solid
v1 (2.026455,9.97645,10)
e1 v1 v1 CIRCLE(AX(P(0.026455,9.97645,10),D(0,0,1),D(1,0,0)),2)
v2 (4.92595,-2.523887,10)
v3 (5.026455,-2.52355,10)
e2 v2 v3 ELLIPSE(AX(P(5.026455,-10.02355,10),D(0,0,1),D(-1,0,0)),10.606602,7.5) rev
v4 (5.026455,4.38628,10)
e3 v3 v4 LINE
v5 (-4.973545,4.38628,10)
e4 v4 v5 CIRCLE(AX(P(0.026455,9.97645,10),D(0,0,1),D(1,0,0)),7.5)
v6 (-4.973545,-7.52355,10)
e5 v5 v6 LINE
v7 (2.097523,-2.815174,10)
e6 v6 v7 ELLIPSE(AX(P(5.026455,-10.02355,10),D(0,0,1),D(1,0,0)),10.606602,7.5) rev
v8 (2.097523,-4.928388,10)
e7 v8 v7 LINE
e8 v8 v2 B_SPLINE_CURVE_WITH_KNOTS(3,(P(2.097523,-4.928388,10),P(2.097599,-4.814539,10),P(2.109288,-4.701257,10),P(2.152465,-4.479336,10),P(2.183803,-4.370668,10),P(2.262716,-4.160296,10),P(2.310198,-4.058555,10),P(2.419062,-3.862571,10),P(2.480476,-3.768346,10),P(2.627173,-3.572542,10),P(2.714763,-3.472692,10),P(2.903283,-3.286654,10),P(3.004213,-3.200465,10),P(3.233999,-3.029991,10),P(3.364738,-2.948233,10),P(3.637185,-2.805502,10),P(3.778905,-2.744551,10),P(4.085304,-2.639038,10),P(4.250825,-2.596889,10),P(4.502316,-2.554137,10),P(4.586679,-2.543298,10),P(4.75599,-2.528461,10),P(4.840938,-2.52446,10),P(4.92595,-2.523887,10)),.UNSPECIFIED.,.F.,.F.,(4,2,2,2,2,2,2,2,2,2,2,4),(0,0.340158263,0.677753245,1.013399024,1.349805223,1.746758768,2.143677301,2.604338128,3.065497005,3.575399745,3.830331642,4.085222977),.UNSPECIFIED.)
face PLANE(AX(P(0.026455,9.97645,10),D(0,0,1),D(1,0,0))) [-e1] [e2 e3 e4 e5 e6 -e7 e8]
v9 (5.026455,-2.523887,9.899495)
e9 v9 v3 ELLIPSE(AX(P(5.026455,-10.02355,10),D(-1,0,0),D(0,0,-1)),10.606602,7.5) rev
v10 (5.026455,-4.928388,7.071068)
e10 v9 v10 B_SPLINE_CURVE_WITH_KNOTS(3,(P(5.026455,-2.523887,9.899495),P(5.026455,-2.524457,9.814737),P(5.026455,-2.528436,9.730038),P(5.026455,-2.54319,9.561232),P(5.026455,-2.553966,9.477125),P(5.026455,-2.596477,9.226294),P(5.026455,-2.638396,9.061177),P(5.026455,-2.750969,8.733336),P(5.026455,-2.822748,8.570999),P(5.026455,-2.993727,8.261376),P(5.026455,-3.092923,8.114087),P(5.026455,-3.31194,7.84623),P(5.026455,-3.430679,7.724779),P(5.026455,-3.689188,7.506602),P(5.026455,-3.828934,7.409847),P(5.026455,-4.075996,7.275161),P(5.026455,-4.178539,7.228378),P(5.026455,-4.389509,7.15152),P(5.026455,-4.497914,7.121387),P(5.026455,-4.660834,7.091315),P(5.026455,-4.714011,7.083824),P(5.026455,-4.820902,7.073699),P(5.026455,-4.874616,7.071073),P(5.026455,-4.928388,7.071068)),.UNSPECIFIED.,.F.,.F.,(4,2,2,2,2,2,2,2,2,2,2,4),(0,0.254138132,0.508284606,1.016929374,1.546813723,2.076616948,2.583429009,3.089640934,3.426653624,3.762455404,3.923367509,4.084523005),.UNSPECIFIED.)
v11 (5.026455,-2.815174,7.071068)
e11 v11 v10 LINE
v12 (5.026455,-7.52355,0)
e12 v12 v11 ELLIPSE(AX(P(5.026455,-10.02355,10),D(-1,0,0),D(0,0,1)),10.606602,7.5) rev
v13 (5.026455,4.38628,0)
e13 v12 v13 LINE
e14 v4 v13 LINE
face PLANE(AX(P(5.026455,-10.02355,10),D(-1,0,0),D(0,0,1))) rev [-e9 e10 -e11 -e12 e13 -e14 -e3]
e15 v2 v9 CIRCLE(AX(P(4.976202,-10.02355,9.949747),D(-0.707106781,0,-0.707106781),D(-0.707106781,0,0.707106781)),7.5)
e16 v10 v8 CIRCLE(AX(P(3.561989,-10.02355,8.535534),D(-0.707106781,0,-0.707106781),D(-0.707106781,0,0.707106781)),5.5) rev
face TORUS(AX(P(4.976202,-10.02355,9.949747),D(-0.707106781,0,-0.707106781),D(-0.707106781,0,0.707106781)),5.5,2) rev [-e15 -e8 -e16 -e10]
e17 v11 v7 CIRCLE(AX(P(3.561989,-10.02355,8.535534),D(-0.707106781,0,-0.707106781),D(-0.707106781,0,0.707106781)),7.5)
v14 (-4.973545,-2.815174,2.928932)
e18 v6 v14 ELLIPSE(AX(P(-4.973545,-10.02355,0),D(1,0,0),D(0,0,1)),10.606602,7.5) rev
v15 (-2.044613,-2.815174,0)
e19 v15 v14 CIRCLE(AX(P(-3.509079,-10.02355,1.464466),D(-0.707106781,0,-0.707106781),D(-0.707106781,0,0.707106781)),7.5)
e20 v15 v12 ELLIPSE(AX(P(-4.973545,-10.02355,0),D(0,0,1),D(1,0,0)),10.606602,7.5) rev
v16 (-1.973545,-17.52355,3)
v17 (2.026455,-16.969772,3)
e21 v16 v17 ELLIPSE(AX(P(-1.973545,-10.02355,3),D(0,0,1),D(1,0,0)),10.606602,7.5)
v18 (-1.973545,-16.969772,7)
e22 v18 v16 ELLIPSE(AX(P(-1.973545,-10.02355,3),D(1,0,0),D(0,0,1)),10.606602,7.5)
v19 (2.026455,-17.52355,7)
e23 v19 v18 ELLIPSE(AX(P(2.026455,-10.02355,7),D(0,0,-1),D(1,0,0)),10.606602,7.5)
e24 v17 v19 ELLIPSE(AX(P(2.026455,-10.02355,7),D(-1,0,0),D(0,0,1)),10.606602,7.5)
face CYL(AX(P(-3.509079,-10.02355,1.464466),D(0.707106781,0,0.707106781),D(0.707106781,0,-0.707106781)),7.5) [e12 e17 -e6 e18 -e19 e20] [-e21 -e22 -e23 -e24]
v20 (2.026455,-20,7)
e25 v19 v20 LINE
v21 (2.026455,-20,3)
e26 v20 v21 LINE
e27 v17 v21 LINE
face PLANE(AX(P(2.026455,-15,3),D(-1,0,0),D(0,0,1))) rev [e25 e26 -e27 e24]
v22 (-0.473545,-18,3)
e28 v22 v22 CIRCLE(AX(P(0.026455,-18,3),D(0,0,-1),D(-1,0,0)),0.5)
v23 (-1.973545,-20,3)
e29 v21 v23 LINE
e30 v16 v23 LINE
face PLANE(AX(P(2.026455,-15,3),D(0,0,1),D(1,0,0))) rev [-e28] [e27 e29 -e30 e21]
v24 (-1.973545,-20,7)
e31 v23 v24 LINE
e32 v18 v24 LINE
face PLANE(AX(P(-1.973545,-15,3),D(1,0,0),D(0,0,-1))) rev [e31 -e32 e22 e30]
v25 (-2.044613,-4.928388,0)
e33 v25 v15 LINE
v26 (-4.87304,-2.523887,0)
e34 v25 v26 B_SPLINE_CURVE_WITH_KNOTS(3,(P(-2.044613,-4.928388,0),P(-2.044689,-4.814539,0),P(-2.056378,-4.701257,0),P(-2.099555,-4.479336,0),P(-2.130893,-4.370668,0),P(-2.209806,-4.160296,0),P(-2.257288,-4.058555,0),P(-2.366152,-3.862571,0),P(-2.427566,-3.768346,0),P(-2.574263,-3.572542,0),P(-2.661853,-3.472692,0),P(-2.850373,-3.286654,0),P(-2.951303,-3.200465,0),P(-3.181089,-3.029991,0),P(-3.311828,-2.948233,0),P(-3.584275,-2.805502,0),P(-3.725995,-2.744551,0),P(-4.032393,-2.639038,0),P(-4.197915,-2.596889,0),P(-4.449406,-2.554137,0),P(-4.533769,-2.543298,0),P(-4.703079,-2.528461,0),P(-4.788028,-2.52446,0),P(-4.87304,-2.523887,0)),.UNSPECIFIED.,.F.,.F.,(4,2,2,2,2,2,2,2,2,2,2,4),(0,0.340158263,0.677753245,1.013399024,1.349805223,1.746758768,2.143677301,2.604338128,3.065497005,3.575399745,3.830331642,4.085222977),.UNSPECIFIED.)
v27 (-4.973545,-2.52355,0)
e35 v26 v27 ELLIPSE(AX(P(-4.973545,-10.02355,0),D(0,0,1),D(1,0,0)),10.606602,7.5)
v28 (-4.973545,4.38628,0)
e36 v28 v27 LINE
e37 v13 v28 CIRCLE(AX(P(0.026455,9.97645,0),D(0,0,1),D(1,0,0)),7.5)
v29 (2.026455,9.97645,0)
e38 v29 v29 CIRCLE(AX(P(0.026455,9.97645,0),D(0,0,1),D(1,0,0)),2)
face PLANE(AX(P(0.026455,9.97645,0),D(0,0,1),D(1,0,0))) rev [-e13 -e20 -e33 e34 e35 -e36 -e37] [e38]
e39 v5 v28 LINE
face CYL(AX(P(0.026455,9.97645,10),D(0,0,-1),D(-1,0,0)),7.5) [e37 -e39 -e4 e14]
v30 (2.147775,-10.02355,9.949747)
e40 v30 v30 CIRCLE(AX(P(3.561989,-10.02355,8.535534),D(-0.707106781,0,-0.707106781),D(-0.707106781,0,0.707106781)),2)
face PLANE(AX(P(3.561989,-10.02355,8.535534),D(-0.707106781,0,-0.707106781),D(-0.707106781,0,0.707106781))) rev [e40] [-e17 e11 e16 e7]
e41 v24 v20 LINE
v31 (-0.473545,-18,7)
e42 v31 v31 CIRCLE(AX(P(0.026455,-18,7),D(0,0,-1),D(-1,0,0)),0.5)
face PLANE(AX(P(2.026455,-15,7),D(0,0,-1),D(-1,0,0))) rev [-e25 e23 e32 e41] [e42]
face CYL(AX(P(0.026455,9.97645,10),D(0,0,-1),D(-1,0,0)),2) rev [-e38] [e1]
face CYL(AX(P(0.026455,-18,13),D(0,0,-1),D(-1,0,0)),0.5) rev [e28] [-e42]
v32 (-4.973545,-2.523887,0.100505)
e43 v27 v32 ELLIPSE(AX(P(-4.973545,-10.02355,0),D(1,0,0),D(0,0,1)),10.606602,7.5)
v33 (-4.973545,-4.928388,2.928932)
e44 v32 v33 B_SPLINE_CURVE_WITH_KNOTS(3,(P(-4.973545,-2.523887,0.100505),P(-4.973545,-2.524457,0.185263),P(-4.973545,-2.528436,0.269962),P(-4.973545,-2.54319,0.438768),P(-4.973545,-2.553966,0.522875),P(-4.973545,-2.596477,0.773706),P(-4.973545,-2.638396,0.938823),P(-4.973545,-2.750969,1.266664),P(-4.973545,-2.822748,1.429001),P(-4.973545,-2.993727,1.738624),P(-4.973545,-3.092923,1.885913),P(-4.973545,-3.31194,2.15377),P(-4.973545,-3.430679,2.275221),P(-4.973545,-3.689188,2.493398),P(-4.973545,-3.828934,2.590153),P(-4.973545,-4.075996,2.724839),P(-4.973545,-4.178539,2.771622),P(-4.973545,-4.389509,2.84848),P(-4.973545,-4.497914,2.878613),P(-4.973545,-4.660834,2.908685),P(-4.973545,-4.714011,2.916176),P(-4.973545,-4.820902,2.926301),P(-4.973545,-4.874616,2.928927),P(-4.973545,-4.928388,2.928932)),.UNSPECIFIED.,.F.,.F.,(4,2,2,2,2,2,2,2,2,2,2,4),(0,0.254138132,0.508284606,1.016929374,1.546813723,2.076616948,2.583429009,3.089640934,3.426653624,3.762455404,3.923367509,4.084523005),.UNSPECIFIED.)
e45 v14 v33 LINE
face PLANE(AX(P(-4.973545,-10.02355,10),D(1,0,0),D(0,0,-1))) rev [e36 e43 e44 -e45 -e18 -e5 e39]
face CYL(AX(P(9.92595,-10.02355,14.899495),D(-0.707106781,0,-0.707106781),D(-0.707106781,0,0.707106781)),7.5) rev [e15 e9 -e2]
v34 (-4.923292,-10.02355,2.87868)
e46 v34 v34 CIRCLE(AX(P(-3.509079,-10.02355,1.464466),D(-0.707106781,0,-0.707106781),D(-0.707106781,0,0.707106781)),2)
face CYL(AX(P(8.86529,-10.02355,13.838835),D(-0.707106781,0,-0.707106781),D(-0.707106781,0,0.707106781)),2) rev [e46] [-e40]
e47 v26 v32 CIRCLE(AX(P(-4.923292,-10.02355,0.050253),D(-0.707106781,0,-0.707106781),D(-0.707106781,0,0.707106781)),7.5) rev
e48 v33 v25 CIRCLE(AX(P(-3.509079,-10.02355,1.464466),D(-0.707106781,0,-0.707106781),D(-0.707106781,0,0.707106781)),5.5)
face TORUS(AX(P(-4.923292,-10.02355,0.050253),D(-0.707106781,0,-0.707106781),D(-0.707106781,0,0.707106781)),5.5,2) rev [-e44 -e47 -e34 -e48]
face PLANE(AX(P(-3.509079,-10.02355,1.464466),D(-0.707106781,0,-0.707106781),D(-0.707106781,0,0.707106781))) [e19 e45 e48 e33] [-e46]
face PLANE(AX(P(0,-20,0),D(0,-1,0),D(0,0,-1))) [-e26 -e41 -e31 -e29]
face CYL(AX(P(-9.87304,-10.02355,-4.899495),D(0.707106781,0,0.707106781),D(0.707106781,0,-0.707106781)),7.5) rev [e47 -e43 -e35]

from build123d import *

# Parameters (mm, degrees)
SKETCH1_R               = 2
BOSS_EXTRUDE1_DEPTH     = 10
SKETCH6_R               = 7.5
BOSS_EXTRUDE3_DEPTH     = 5
CUT_EXTRUDE4_DEPTH      = 26.013853674
CUT_EXTRUDE4_DEPTH_BACK = 26.013853674
SKETCH7_R               = 2
SKETCH10_R              = 7.5
CUT_EXTRUDE7_DEPTH      = 9
SKETCH11_W              = 4
SKETCH11_H              = 4
BOSS_EXTRUDE4_DEPTH     = 2.5
FILLET1_R               = 2
SKETCH12_R              = 0.5
CUT_EXTRUDE8_DEPTH      = 10


with BuildPart() as part:
    # Sketch1 → Boss-Extrude1 (new body)
    with BuildSketch(Plane.XY):
        with BuildLine():
            Line((5.026455026, -10.023549892), (-4.973544974, -10.023549892))
            Line((-4.973544974, -10.023549892), (-4.973544974, 4.386280164))
            ThreePointArc((-4.973544974, 4.386280164), (0.026455026, 17.476450108), (5.026455026, 4.386280164))
            Line((5.026455026, 4.386280164), (5.026455026, -10.023549892))
        make_face()
        with Locations((0.026455026, 9.976450108)):
            Circle(SKETCH1_R, mode=Mode.SUBTRACT)
    extrude(amount=BOSS_EXTRUDE1_DEPTH)

    # Sketch6 → Boss-Extrude3 (add, symmetric)
    with BuildSketch(Plane(origin=(2.513227513, 0, 2.513227513), x_dir=(-0.7071067811865477, 0, 0.7071067811865475), z_dir=(-0.7071067811865475, 0, -0.7071067811865477))):
        with Locations((3.516827377, -10.023549892)):
            Circle(SKETCH6_R)
    extrude(amount=BOSS_EXTRUDE3_DEPTH, both=True)

    # Sketch7 → Cut-Extrude4 (cut, two sides: drawn at the far end of the back side and taken through both)
    with BuildSketch(Plane(origin=(-1.022306393, 0, -1.022306393), x_dir=(-0.7071067811865476, 0, 0.7071067811865476), z_dir=(-0.7071067811865476, 0, -0.7071067811865476)).offset(-CUT_EXTRUDE4_DEPTH_BACK)):
        with Locations((3.516827377, -10.023549892)):
            Circle(SKETCH7_R)
    extrude(amount=CUT_EXTRUDE4_DEPTH + CUT_EXTRUDE4_DEPTH_BACK, mode=Mode.SUBTRACT)

    # Sketch10 → Cut-Extrude7 (cut)
    with BuildSketch(Plane(origin=(6.048761419, 0, 6.048761419), x_dir=(0.7071067811865476, 0, -0.7071067811865476), z_dir=(0.7071067811865476, 0, 0.7071067811865476))):
        with Locations((-3.516827377, -10.023549892)):
            Circle(SKETCH10_R)
    cut_extrude7 = extrude(amount=CUT_EXTRUDE7_DEPTH, mode=Mode.SUBTRACT)

    # Mirror1: Cut-Extrude7 across plane
    add(cut_extrude7.mirror(Plane(origin=(2.513227513, 0, 2.513227513), x_dir=(-0.7071067811865478, 0, 0.7071067811865472), z_dir=(-0.7071067811865475, 0, -0.7071067811865477))), mode=Mode.SUBTRACT)

    # Sketch11 → Boss-Extrude4 (add, symmetric)
    with BuildSketch(Plane(origin=(0, -17.5, 0), x_dir=(1, 0, 0), z_dir=(0, 1, 0))):
        with Locations((0.026455026, -5)):
            Rectangle(SKETCH11_W, SKETCH11_H)
    extrude(amount=BOSS_EXTRUDE4_DEPTH, both=True)

    # Fillet1
    # the kernel refuses this fillet: 2 mm, written as the material it adds along each edge
    with BuildSketch(Plane(origin=(3.561988932, -10.023549892, 8.535533906), x_dir=(0.5737197168089216, 0.5845437306903406, -0.5737197168089216), z_dir=(0.4133348358712229, -0.8113622045120283, -0.4133348358712229))) as fillet1_piece_1_section:
        with BuildLine():
            CenterArc((7.5 - FILLET1_R, FILLET1_R), FILLET1_R, 270, 90)
            Line((7.5 - FILLET1_R, 0), (7.5, 0))
            Line((7.5, 0), (7.5, FILLET1_R))
        make_face()
    fillet1_piece_1 = revolve(axis=Axis((3.561988932, -10.023549892, 8.535533906), (0.7071067811865476, 0, 0.7071067811865476)), revolution_arc=108.458473571, mode=Mode.PRIVATE)
    fillet1_piece_1 = split(fillet1_piece_1, bisect_by=Plane(origin=(5.026455026, -3.097280079, 8.789305728), z_dir=(-1, 0, 0)), keep=Keep.TOP, mode=Mode.PRIVATE)
    fillet1_piece_1 = split(fillet1_piece_1, bisect_by=Plane(origin=(3.815760609, -3.097280079, 10), z_dir=(0, 0, -1)), keep=Keep.TOP, mode=Mode.PRIVATE)
    add(fillet1_piece_1)
    with BuildSketch(Plane(origin=(-3.509078879, -10.023549892, 1.464466094), x_dir=(0.5737197168089216, 0.584543730690341, -0.5737197168089213), z_dir=(0.4133348358712232, -0.8113622045120281, -0.4133348358712231))) as fillet1_piece_2_section:
        with BuildLine():
            CenterArc((7.5 - FILLET1_R, -FILLET1_R), FILLET1_R, 0, 90)
            Line((7.5 - FILLET1_R, 0), (7.5, 0))
            Line((7.5, 0), (7.5, -FILLET1_R))
        make_face()
    fillet1_piece_2 = revolve(axis=Axis((-3.509078879, -10.023549892, 1.464466094), (0.7071067811865475, 0, 0.7071067811865477)), revolution_arc=108.458473571, mode=Mode.PRIVATE)
    fillet1_piece_2 = split(fillet1_piece_2, bisect_by=Plane(origin=(-3.762850661, -3.097280076, 0), z_dir=(0, 0, 1)), keep=Keep.TOP, mode=Mode.PRIVATE)
    fillet1_piece_2 = split(fillet1_piece_2, bisect_by=Plane(origin=(-4.973544974, -3.097280076, 1.21069445), z_dir=(1, 0, 0)), keep=Keep.TOP, mode=Mode.PRIVATE)
    add(fillet1_piece_2)

    # Sketch12 → Cut-Extrude8 (cut)
    with BuildSketch(Plane(origin=(0, 0, 3), x_dir=(-1, 0, 0), z_dir=(0, 0, -1))):
        with Locations((-0.026455026, -18)):
            Circle(SKETCH12_R)
    extrude(amount=-CUT_EXTRUDE8_DEPTH, mode=Mode.SUBTRACT)


solid = part.part
